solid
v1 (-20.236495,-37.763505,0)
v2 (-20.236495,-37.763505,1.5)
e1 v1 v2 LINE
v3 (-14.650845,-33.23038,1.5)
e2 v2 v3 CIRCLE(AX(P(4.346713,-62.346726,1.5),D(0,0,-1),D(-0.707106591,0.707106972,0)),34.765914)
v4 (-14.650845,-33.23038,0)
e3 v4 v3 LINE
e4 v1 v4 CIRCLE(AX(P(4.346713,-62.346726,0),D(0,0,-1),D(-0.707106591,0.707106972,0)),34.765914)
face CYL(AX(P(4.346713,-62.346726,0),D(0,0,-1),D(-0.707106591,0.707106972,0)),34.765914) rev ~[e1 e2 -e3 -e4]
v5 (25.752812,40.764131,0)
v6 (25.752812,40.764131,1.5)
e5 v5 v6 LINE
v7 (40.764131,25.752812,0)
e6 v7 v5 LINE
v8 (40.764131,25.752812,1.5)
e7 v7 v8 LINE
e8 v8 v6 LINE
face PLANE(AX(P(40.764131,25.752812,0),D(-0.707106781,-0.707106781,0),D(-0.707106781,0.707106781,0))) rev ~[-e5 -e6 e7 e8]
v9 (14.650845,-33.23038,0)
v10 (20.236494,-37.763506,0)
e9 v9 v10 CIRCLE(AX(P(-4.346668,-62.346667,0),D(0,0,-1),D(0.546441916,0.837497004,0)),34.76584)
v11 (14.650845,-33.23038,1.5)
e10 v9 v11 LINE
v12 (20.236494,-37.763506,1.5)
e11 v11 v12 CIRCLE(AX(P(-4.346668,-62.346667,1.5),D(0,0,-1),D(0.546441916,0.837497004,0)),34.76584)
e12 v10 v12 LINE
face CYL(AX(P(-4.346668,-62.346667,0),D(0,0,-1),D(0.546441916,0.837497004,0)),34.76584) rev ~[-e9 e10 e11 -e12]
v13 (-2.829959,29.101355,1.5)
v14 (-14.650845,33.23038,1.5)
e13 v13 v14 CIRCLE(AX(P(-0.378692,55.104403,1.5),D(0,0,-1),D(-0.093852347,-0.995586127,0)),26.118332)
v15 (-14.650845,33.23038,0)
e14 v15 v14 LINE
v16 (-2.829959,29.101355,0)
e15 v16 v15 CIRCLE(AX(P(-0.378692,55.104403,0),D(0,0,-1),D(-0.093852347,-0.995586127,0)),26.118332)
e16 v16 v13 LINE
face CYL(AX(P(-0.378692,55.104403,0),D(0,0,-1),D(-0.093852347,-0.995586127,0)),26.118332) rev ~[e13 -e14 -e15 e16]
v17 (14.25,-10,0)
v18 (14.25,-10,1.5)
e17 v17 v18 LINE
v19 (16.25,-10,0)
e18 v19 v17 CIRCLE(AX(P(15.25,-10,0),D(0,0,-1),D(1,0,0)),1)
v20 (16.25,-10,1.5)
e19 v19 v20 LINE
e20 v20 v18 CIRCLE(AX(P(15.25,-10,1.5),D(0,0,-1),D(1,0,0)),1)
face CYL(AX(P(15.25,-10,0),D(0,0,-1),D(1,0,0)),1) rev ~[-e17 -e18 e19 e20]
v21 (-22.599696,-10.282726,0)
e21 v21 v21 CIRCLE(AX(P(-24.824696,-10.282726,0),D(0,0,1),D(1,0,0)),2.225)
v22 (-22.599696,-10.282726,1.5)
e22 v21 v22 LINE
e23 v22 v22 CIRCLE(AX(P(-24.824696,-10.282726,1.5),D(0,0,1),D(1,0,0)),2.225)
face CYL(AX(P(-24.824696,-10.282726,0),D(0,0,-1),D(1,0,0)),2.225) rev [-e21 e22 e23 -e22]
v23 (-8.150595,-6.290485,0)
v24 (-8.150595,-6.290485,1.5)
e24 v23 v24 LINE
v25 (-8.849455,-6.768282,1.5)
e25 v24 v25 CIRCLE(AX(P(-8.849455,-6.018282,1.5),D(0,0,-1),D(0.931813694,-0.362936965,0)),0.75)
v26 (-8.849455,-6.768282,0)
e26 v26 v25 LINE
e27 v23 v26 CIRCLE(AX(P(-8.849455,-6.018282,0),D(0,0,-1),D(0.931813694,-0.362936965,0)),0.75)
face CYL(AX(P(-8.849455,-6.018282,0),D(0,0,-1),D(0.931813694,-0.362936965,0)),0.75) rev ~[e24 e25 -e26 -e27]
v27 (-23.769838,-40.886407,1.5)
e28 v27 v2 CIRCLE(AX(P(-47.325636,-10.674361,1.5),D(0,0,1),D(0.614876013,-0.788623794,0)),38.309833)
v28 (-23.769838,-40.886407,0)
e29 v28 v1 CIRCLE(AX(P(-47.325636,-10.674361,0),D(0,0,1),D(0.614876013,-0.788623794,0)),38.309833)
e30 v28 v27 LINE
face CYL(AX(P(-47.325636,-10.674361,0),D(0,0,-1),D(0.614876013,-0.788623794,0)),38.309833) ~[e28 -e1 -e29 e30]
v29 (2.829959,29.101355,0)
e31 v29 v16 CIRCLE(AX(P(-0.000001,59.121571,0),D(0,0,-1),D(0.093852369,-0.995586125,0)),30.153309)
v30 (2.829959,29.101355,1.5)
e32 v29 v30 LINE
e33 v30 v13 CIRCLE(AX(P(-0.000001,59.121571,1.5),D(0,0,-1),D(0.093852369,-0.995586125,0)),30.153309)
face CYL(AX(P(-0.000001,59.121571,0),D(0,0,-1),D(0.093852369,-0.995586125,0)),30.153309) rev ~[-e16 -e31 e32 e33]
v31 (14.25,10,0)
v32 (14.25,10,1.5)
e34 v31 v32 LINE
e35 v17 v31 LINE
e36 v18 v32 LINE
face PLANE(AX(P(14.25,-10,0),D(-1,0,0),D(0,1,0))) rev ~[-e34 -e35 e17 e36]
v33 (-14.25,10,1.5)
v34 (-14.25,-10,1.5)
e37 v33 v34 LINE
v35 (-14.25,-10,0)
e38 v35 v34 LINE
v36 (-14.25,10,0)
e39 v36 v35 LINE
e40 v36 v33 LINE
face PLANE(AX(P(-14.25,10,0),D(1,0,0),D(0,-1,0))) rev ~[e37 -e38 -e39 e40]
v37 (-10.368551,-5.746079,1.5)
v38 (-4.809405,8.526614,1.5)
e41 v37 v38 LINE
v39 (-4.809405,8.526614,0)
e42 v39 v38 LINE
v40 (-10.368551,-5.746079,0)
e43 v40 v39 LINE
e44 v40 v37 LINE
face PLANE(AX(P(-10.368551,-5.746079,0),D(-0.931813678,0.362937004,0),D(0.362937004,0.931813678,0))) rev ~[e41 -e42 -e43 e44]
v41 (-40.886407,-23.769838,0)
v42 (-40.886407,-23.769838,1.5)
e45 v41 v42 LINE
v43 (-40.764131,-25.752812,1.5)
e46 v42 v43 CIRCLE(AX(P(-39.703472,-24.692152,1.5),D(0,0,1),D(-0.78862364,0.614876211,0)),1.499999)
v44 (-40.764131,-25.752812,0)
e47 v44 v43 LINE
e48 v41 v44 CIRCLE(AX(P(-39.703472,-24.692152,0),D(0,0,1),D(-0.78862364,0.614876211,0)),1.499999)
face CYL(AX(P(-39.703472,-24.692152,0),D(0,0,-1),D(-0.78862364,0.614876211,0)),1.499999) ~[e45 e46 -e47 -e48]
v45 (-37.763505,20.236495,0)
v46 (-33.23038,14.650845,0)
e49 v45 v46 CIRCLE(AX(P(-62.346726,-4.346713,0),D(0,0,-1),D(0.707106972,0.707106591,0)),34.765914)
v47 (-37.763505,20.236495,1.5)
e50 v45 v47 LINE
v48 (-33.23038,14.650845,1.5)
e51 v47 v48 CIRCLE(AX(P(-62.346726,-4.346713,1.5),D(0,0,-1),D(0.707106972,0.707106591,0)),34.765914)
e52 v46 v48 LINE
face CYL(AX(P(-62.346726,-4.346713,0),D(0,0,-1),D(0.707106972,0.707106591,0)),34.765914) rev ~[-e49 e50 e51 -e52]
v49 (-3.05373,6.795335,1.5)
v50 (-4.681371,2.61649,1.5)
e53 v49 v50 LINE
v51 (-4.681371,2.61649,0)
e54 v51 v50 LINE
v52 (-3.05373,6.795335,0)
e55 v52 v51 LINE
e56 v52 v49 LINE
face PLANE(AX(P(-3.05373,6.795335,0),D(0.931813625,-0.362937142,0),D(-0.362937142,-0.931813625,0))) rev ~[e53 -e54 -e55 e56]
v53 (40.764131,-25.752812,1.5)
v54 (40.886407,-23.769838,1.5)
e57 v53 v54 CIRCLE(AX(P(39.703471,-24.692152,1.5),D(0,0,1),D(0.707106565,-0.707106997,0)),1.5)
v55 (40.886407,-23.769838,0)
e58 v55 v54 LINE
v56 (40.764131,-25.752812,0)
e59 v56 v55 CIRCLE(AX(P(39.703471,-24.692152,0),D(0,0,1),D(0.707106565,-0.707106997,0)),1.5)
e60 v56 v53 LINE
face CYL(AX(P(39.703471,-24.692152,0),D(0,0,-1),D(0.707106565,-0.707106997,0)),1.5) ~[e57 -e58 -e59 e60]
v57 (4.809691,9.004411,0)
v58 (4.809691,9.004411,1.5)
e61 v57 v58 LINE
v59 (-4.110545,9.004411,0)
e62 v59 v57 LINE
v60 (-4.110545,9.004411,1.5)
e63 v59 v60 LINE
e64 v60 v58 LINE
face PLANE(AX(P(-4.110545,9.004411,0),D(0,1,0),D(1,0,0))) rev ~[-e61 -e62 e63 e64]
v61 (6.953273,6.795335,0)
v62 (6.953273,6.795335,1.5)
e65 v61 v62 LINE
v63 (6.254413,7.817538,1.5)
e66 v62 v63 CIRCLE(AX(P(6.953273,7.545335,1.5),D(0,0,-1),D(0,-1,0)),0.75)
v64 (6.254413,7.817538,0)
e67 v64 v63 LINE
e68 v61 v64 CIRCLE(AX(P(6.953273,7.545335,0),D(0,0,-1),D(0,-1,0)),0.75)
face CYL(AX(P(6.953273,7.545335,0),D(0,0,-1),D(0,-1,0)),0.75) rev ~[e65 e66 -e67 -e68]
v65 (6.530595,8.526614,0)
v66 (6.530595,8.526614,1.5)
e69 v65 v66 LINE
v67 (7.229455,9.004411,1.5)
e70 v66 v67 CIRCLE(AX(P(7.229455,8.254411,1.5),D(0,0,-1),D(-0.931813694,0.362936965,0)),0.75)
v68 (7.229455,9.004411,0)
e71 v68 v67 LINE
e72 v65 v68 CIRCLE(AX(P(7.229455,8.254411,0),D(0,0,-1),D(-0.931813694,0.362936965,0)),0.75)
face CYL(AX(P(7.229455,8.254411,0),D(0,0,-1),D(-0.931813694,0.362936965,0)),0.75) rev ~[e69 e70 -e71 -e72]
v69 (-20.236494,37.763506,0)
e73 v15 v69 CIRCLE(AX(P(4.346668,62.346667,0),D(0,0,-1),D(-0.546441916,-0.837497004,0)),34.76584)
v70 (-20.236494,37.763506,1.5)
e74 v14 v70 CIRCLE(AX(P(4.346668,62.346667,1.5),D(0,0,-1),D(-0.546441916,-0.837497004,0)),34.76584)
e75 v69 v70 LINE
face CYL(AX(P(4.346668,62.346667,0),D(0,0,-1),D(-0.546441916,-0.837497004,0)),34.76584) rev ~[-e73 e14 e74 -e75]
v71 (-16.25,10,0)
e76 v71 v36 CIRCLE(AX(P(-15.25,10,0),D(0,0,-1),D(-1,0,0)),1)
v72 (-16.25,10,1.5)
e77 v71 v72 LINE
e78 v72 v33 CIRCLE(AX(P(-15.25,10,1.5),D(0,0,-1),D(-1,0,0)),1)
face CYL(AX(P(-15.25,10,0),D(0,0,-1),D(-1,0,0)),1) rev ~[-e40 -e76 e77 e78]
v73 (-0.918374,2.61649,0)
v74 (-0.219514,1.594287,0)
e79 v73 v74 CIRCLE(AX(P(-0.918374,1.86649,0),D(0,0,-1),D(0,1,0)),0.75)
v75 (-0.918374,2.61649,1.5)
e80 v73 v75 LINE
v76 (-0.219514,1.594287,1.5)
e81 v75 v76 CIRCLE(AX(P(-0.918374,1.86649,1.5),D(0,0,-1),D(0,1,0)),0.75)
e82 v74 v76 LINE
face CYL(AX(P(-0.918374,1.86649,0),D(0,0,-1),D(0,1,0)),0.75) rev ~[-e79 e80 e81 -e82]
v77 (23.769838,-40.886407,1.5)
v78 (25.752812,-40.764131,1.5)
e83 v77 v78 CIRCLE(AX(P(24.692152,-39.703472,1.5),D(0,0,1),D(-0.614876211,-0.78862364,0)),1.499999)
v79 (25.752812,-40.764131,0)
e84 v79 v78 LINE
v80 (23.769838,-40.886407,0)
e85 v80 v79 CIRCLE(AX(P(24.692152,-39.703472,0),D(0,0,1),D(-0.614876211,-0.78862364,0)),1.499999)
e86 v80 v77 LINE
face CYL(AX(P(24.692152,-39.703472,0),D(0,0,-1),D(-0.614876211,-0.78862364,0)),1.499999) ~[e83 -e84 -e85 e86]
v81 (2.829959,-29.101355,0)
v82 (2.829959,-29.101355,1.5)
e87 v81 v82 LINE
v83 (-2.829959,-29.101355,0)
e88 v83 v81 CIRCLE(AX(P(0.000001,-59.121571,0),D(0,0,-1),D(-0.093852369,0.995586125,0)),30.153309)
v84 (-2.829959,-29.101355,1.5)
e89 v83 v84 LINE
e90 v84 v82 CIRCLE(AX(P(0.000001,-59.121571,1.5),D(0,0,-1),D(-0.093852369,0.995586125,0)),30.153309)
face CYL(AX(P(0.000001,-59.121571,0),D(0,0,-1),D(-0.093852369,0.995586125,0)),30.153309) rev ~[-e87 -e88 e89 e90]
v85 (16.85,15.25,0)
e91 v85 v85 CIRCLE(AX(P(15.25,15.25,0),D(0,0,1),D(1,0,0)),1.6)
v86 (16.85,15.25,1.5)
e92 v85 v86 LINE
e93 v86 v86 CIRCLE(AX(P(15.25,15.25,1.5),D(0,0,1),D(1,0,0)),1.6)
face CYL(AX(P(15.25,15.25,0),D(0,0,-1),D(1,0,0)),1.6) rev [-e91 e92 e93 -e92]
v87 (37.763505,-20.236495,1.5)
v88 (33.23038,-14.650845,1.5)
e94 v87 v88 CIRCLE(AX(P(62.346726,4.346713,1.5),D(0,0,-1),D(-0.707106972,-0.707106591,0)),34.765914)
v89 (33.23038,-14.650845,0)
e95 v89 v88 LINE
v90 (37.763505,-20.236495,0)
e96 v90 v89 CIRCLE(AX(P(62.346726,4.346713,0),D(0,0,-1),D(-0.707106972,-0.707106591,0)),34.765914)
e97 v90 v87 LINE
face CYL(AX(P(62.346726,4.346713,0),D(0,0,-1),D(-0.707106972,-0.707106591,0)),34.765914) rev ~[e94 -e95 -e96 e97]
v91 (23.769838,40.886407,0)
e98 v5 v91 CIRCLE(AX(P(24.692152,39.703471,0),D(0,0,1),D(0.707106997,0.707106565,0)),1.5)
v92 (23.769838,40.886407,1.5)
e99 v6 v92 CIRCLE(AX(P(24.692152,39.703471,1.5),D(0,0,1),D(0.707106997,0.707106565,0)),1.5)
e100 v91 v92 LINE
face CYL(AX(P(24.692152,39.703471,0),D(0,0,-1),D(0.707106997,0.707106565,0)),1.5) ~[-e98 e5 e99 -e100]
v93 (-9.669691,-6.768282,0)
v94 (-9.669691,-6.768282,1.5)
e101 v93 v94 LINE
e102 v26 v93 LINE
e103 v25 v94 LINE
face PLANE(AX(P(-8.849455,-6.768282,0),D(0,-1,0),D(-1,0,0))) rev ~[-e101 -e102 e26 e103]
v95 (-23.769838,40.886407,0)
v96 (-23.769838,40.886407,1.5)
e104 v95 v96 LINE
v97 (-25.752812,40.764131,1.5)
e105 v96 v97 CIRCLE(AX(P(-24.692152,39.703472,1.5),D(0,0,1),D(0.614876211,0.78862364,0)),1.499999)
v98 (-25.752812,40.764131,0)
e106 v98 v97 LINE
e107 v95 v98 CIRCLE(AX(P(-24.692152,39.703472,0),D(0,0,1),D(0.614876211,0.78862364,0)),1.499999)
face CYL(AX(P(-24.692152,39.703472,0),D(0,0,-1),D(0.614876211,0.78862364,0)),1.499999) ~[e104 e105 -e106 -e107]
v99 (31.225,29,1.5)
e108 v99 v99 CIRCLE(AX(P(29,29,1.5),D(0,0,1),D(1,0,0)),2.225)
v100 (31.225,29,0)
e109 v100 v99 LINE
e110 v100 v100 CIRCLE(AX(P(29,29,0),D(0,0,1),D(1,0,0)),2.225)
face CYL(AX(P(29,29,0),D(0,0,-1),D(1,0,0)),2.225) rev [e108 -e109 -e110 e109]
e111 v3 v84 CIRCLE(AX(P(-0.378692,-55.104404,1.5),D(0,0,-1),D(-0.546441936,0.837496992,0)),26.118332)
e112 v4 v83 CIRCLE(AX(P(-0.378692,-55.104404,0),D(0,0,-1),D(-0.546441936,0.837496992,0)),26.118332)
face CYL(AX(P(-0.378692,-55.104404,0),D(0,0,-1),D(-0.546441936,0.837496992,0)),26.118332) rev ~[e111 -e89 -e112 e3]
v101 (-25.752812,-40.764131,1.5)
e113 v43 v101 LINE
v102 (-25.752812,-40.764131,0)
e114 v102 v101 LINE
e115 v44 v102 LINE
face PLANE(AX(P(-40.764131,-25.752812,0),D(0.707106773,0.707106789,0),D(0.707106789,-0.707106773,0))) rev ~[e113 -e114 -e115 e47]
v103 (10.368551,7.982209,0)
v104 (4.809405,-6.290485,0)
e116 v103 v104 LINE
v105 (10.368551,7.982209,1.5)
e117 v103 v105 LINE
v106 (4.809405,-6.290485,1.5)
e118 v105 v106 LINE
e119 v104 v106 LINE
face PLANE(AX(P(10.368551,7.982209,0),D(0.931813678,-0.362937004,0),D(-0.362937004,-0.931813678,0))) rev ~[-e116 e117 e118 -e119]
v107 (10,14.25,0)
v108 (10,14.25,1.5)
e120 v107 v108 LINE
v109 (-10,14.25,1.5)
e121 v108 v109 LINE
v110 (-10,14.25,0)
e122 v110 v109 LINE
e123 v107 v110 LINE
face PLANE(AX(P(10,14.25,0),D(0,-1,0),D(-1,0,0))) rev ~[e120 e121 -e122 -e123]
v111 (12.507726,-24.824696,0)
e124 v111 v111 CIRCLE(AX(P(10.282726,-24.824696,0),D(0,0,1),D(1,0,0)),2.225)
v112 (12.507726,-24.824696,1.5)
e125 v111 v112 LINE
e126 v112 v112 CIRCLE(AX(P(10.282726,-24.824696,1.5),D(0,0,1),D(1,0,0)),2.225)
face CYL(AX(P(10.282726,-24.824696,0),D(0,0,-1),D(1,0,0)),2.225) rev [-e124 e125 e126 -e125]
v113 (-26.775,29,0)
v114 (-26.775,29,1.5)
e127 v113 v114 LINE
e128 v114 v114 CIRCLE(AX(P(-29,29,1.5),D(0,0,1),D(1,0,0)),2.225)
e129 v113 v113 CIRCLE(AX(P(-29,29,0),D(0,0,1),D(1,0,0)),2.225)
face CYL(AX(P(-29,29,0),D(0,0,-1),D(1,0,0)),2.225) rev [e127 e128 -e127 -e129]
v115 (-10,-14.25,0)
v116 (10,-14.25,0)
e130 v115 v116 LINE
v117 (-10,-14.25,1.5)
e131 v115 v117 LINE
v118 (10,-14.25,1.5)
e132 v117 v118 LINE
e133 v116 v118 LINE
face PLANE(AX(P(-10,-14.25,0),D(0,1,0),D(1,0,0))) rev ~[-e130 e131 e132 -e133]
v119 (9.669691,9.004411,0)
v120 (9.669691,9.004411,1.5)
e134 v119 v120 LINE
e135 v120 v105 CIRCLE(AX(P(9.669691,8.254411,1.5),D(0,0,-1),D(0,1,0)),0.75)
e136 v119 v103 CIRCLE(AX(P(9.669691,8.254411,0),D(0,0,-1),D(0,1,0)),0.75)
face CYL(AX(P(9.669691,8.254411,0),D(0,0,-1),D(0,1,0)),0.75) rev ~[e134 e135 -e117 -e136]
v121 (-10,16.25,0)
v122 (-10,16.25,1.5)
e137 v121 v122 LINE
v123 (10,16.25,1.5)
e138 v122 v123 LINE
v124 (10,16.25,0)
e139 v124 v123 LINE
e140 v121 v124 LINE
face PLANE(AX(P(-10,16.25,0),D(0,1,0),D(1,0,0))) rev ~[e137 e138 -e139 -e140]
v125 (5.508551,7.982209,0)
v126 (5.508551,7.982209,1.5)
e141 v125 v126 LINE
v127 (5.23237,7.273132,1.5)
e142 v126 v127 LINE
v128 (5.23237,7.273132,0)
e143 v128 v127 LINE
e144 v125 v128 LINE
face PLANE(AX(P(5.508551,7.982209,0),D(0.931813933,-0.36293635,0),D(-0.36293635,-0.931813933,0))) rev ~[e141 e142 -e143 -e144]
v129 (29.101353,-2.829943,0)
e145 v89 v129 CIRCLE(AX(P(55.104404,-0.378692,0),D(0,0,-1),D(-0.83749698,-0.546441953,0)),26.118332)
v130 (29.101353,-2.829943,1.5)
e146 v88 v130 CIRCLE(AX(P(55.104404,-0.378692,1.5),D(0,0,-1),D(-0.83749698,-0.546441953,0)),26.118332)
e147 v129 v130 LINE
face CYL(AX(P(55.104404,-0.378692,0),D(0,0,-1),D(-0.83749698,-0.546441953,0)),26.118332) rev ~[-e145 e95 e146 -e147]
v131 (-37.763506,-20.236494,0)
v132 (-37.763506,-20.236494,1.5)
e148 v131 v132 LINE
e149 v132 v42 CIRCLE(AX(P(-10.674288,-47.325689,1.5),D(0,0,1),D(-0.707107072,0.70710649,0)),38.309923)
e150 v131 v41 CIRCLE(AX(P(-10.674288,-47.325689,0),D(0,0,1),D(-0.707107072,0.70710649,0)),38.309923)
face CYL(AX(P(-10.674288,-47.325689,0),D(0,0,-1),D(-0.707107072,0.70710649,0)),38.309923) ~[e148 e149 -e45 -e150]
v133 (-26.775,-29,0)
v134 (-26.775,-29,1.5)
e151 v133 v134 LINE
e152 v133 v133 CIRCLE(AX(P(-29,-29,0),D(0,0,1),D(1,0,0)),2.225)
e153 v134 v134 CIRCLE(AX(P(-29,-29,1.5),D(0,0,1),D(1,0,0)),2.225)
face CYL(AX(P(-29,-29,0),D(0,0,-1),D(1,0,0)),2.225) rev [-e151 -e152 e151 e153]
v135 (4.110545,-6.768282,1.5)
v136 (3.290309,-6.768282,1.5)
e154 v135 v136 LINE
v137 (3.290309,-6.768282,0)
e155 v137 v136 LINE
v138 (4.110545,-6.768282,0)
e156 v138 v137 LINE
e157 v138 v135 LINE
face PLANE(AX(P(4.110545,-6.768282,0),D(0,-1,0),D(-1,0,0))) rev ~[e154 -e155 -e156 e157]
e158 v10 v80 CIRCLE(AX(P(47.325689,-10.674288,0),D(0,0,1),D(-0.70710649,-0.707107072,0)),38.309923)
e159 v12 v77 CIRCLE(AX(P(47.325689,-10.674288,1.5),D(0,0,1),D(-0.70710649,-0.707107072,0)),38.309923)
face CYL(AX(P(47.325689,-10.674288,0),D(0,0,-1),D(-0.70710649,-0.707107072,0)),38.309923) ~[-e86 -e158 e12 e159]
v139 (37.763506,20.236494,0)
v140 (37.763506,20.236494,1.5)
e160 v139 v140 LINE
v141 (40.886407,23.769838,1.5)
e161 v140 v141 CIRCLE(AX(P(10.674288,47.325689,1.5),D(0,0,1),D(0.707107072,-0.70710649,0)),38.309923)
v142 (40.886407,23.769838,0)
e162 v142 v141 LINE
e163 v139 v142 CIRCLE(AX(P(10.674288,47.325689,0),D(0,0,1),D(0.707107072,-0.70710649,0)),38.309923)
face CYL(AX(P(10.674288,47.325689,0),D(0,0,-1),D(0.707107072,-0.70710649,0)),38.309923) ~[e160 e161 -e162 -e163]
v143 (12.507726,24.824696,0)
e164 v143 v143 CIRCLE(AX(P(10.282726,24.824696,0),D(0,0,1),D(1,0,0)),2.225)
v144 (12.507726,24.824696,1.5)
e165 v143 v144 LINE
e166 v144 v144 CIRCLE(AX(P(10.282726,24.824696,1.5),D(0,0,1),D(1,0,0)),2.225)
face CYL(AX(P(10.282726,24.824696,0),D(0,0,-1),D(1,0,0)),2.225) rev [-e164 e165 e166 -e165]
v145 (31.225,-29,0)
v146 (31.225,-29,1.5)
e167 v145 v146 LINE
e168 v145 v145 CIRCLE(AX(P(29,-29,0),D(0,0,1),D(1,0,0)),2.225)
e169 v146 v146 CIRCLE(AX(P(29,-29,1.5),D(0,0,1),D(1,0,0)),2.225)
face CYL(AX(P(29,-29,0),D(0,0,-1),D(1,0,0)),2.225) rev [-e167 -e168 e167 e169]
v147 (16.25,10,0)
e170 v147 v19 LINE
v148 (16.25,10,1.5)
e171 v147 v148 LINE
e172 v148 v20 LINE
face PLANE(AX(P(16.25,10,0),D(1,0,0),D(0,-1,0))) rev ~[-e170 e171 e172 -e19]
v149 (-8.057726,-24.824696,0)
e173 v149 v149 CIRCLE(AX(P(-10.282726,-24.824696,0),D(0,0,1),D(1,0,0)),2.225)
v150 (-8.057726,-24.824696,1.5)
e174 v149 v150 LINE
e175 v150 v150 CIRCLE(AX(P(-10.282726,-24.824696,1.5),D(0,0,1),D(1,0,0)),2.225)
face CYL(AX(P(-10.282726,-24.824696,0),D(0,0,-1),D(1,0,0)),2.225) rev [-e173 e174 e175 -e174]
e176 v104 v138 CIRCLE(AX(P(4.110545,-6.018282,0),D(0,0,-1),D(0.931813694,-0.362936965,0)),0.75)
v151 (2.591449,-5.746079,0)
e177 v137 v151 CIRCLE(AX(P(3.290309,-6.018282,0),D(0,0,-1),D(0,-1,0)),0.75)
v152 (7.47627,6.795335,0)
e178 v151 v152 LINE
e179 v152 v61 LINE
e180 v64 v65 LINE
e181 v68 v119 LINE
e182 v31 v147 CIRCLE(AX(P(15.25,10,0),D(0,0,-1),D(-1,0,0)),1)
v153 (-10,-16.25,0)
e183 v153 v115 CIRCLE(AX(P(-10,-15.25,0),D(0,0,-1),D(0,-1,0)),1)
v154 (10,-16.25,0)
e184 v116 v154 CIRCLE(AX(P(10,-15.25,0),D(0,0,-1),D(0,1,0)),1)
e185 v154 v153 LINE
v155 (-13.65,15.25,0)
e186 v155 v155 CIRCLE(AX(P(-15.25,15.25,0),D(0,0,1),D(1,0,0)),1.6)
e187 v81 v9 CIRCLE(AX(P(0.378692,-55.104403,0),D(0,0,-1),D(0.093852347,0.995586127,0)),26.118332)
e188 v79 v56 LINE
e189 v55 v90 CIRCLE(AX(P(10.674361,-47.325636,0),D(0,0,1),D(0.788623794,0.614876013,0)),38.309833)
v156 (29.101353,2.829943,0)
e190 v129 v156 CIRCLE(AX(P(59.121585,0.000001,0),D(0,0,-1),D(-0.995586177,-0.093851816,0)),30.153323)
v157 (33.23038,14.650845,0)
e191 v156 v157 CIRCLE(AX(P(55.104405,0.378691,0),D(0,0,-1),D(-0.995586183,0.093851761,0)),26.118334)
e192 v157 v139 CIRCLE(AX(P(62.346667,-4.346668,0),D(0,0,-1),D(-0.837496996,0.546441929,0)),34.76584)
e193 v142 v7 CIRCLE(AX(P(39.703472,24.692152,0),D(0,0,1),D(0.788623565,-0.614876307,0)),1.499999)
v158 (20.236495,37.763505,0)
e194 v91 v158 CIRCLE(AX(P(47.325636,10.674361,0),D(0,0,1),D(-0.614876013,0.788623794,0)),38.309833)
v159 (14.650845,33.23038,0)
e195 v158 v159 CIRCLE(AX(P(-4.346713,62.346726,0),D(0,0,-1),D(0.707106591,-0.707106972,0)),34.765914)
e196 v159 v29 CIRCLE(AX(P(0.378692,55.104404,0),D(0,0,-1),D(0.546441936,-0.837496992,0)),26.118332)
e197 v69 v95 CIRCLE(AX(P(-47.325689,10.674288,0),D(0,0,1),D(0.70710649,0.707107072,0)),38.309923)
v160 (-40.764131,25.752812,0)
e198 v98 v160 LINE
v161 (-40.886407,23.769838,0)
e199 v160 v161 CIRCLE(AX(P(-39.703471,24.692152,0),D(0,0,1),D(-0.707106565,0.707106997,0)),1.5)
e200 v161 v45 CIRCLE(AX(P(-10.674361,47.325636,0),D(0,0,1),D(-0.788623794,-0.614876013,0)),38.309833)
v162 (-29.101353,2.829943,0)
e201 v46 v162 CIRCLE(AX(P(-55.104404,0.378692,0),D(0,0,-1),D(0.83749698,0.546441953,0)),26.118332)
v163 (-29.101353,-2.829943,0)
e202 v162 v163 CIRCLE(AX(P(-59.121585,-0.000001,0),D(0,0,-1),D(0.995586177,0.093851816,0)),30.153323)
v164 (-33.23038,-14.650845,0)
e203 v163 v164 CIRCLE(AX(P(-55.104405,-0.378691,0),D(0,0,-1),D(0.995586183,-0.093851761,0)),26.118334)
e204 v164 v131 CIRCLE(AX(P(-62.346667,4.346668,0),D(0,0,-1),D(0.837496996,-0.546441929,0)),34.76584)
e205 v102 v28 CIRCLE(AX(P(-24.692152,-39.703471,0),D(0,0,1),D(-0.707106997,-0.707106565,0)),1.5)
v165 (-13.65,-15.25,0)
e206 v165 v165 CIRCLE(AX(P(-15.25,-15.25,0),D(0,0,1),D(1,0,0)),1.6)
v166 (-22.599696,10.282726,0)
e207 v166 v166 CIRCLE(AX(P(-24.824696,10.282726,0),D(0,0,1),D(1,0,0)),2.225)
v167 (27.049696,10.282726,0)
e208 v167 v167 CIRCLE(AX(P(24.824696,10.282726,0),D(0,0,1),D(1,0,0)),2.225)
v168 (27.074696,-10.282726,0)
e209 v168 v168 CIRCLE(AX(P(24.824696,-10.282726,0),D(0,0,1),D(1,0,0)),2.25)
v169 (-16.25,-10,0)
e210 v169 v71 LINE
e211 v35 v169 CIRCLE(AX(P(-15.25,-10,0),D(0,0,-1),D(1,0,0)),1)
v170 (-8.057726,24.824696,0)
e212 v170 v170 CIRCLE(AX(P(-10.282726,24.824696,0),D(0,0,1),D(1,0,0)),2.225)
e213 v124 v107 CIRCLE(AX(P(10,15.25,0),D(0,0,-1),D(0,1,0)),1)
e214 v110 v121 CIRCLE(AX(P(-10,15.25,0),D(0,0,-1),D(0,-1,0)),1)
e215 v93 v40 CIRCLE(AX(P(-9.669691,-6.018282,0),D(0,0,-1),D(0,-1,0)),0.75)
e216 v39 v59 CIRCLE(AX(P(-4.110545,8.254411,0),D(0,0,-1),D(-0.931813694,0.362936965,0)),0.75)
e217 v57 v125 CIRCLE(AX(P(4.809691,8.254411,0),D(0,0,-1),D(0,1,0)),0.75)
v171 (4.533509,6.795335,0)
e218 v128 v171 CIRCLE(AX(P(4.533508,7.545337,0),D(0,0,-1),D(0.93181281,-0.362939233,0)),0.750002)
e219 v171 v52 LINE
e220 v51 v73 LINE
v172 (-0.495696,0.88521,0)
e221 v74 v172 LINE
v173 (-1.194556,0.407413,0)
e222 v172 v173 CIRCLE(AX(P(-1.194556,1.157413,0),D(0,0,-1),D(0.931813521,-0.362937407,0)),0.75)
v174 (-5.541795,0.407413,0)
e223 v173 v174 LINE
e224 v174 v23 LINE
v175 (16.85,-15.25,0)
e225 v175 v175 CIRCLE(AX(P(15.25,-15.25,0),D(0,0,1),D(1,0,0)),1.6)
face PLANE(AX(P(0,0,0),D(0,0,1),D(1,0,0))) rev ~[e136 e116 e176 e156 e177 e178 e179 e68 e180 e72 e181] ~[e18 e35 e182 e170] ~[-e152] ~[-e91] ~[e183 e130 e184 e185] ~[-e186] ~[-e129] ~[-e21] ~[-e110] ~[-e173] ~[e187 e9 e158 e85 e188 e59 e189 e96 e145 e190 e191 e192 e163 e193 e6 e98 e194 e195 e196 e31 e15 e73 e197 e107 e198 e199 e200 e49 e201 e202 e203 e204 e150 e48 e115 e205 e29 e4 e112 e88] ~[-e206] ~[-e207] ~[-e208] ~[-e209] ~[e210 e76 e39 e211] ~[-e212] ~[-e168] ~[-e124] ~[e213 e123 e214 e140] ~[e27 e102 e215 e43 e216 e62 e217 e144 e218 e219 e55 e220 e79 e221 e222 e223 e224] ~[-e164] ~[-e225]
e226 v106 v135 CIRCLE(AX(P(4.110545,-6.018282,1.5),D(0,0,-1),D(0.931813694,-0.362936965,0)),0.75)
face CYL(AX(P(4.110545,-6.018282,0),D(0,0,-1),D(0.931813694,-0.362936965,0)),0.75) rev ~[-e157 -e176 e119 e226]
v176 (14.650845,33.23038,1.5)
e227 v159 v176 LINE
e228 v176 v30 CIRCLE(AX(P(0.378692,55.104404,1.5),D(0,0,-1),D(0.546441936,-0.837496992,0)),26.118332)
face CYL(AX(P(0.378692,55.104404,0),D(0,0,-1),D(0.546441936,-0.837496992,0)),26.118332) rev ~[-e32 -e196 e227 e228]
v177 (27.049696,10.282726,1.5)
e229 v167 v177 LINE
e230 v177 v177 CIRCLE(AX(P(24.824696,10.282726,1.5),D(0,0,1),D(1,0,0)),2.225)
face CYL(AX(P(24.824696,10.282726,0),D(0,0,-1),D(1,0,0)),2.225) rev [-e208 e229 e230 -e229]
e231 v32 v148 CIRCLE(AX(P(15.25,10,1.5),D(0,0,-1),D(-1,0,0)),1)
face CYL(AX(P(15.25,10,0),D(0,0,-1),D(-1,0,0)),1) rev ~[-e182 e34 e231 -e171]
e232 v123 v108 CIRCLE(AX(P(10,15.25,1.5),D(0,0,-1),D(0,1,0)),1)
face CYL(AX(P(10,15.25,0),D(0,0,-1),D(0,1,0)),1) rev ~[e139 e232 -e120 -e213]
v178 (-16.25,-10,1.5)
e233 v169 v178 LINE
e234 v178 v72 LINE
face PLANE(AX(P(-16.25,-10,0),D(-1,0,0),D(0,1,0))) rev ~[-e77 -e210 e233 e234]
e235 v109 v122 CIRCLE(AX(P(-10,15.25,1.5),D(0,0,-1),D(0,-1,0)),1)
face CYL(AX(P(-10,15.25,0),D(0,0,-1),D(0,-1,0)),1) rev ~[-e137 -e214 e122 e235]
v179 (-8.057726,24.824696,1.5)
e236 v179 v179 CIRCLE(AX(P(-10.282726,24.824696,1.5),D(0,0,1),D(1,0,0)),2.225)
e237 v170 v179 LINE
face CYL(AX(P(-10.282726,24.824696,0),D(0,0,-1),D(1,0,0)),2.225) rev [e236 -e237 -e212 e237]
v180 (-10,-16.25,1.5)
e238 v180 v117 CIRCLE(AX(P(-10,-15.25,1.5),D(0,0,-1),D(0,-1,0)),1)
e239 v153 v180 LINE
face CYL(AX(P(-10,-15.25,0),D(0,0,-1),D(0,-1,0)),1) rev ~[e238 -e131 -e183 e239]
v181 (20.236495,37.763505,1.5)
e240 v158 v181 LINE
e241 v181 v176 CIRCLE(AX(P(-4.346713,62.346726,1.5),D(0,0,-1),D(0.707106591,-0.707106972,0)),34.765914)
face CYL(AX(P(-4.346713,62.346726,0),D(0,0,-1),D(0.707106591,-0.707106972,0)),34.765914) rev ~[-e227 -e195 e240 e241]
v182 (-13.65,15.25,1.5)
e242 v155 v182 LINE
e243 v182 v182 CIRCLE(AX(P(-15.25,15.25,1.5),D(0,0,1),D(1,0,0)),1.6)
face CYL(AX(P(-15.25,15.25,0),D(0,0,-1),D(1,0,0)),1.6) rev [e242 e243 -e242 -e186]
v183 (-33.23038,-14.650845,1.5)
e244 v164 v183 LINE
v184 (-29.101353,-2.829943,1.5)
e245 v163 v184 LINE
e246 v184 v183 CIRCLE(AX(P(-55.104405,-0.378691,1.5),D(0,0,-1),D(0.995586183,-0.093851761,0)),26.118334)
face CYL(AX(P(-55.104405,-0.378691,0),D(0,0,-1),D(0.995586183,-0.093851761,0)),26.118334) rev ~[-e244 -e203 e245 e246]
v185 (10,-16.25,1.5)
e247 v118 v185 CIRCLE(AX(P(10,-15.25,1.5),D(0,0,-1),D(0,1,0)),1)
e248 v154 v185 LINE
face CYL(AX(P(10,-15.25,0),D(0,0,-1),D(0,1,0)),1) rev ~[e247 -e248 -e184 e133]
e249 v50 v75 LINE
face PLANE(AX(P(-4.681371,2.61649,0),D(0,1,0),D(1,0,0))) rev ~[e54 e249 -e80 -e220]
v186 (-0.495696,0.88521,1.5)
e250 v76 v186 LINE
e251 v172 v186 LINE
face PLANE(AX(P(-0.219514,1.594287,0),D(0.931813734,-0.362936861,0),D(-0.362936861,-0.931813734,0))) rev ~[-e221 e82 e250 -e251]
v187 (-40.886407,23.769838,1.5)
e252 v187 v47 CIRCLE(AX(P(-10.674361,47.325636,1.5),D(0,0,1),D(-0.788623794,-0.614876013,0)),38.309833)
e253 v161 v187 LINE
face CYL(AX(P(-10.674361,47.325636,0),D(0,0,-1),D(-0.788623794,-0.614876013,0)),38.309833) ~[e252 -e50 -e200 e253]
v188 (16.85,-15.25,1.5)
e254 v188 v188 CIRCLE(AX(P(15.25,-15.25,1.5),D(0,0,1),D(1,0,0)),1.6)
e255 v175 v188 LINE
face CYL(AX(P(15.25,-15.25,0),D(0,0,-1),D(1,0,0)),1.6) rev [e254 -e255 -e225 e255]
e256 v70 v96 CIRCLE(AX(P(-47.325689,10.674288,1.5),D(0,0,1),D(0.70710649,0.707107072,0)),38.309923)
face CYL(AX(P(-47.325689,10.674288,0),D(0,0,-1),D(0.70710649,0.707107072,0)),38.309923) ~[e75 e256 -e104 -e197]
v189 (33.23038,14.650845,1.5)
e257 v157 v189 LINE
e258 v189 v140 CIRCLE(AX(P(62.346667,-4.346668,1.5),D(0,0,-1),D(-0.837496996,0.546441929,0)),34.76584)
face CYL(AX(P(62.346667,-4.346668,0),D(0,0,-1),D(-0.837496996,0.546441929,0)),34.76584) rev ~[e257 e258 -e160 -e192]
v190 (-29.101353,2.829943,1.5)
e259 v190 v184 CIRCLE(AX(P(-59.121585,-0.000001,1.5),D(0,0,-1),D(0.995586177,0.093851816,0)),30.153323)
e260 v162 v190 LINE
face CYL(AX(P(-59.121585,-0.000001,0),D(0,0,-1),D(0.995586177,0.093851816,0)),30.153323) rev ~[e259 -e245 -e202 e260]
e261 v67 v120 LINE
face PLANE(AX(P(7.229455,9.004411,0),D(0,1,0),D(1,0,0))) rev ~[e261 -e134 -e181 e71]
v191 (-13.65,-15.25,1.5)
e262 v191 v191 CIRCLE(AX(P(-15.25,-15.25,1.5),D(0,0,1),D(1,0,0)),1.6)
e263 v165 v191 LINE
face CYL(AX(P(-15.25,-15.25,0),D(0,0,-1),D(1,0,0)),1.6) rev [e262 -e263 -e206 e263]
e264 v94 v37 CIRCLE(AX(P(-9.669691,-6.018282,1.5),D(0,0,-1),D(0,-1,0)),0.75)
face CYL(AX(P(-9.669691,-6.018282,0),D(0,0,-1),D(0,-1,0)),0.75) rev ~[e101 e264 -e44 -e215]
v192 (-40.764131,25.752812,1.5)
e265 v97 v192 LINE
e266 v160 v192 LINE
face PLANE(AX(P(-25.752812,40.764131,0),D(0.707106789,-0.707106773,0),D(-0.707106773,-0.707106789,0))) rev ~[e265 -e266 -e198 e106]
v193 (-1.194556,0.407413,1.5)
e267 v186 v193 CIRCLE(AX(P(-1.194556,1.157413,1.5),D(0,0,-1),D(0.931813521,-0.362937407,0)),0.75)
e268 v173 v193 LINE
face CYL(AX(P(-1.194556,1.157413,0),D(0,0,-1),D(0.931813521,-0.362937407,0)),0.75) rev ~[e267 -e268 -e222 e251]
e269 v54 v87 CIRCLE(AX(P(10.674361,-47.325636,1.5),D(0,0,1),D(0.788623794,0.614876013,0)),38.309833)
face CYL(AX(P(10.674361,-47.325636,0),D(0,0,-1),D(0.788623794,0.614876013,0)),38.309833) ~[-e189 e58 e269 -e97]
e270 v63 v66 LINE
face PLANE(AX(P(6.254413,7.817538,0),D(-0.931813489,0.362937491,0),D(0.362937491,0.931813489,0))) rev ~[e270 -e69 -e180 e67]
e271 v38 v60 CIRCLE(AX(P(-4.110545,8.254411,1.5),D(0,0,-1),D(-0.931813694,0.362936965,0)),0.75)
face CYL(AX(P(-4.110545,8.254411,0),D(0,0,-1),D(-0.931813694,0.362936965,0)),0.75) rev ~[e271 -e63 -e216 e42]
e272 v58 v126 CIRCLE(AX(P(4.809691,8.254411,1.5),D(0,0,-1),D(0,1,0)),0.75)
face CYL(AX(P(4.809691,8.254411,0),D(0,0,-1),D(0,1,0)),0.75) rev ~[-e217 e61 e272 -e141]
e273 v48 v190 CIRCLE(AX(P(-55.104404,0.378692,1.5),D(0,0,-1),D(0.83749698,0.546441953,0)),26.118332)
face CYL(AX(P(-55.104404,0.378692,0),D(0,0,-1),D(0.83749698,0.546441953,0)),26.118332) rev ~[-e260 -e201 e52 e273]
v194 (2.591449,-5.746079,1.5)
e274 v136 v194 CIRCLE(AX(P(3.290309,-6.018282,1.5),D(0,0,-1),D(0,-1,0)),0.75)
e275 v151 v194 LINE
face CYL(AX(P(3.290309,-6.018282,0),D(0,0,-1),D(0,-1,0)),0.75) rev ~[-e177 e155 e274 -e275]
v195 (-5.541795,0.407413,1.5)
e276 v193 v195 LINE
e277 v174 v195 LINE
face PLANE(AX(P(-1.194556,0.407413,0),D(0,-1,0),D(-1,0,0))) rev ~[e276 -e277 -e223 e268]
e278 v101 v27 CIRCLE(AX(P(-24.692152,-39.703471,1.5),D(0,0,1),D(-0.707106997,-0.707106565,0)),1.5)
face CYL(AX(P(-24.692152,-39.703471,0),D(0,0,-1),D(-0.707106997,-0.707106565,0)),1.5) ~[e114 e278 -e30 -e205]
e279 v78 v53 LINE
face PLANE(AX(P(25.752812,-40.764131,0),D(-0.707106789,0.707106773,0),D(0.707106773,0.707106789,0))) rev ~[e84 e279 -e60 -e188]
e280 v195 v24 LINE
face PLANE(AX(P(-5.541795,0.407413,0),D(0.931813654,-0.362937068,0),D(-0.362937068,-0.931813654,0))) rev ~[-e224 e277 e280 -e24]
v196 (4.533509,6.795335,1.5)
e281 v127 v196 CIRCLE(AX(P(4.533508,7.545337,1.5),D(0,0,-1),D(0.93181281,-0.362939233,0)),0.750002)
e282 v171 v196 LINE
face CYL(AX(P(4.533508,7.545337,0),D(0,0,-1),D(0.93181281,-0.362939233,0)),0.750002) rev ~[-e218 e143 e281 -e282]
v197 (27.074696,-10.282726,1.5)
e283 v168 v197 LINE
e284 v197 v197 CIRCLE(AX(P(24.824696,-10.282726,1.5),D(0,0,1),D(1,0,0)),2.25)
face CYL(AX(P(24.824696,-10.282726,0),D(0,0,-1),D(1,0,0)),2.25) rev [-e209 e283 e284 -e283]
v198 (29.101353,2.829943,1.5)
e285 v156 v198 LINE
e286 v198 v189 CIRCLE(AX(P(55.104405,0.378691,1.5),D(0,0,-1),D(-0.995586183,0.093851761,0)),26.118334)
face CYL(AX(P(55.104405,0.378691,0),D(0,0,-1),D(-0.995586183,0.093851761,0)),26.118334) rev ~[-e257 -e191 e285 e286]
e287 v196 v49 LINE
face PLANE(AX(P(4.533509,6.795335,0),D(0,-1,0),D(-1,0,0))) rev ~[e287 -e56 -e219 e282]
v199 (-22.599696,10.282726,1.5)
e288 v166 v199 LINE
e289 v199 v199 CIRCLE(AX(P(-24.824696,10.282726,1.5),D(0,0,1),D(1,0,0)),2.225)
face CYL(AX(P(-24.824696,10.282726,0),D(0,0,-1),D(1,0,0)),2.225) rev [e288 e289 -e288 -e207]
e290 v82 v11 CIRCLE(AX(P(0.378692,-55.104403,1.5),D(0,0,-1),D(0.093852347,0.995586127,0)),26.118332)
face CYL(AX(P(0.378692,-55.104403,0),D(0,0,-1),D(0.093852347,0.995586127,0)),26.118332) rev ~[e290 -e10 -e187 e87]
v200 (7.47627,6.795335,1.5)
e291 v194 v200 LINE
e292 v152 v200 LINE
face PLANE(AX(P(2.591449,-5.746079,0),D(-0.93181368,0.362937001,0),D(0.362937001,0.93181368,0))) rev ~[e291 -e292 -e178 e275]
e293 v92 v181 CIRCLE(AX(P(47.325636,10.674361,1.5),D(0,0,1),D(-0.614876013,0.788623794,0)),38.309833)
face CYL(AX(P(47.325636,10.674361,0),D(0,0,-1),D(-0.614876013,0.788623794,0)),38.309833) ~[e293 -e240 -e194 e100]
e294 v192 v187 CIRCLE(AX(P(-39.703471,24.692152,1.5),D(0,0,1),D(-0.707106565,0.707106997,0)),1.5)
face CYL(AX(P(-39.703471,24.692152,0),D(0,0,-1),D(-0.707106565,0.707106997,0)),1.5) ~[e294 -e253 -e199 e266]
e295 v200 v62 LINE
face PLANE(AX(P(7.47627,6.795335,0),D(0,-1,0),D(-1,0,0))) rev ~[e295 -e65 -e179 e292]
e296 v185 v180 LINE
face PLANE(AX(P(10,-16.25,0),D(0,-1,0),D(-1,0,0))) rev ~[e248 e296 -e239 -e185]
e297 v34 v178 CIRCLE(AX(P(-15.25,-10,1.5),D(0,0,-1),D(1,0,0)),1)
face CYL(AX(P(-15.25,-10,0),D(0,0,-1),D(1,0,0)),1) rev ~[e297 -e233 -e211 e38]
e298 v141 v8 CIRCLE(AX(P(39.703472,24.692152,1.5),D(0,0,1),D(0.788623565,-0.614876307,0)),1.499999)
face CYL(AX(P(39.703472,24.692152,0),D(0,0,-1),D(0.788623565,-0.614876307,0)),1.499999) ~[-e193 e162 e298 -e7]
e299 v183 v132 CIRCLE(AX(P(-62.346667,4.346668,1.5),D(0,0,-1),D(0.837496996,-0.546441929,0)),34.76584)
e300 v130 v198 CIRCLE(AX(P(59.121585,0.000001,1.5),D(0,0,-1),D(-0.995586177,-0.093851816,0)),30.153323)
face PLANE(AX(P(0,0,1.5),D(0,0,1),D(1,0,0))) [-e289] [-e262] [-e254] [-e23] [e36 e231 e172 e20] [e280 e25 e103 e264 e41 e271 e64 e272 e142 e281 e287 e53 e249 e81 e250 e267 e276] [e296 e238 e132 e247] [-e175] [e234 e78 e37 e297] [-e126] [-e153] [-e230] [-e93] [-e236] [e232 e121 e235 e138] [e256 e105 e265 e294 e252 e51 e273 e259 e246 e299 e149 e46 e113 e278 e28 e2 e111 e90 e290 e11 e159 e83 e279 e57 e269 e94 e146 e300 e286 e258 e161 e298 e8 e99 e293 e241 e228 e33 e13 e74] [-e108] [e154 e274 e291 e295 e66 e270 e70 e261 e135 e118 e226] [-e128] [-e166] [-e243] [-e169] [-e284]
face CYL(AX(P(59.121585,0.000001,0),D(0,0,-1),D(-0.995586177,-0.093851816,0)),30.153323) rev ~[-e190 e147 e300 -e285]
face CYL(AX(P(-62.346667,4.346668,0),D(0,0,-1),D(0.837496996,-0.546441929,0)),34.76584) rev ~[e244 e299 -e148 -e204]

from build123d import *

# Parameters (mm, degrees)
F0_R     = 2.225
F0_R_2   = 1.6
F0_R_3   = 2.25
F1_DEPTH = 1.5


# Not quite as in the source:
# - ends of sketch curves that miss each other by under 0.0002 mm in the source are joined


with BuildPart() as f1:
    # F0 (on Top) → F1 (new body)
    with BuildSketch(Plane.XY):
        with BuildLine():
            Line((40.764131, 25.752812), (25.752812, 40.764131))
            ThreePointArc((25.752812, 40.764131), (24.7844707903, 41.2006273849), (23.7698381424, 40.8864068174))
            ThreePointArc((23.7698381424, 40.8864068174), (21.9550704325, 39.3793732762), (20.2364945752, 37.7635054248))
            ThreePointArc((20.2364945752, 37.7635054248), (17.5612326137, 35.3520830837), (14.6508446305, 33.2303795663))
            ThreePointArc((14.6508446305, 33.2303795663), (8.9914965544, 30.4470141229), (2.8299590067, 29.1013549294))
            ThreePointArc((2.8299590067, 29.1013549294), (0, 28.968262), (-2.8299590155, 29.1013548358))
            ThreePointArc((-2.8299590155, 29.1013548358), (-8.9914965544, 30.4470141229), (-14.6508445509, 33.2303796882))
            ThreePointArc((-14.6508445509, 33.2303796882), (-17.5612326137, 35.3520830837), (-20.2364941171, 37.7635058829))
            ThreePointArc((-20.2364941171, 37.7635058829), (-21.9550704325, 39.3793732762), (-23.7698383319, 40.8864065743))
            ThreePointArc((-23.7698383319, 40.8864065743), (-24.7844707903, 41.2006273849), (-25.7528121718, 40.7641311718))
            Line((-25.7528121718, 40.7641311718), (-40.764131, 25.752812))
            ThreePointArc((-40.764131, 25.752812), (-41.2006273849, 24.7844707903), (-40.8864068174, 23.7698381424))
            ThreePointArc((-40.8864068174, 23.7698381424), (-39.3793732762, 21.9550704325), (-37.7635054248, 20.2364945752))
            ThreePointArc((-37.7635054248, 20.2364945752), (-35.3520832558, 17.5612328258), (-33.2303798649, 14.6508450882))
            ThreePointArc((-33.2303798649, 14.6508450882), (-30.4470115556, 8.9914892045), (-29.1013534168, 2.8299429607))
            ThreePointArc((-29.1013534168, 2.8299429607), (-28.968262, 0), (-29.1013532045, -2.8299429807))
            ThreePointArc((-29.1013532045, -2.8299429807), (-30.4470115556, -8.9914892045), (-33.2303799868, -14.6508450086))
            ThreePointArc((-33.2303799868, -14.6508450086), (-35.3520832558, -17.5612328258), (-37.7635058829, -20.2364941171))
            ThreePointArc((-37.7635058829, -20.2364941171), (-39.3793732762, -21.9550704325), (-40.8864065743, -23.7698383319))
            ThreePointArc((-40.8864065743, -23.7698383319), (-41.2006273849, -24.7844707903), (-40.7641311718, -25.7528121718))
            Line((-40.7641311718, -25.7528121718), (-25.752812, -40.764131))
            ThreePointArc((-25.752812, -40.764131), (-24.7844707903, -41.2006273849), (-23.7698381424, -40.8864068174))
            ThreePointArc((-23.7698381424, -40.8864068174), (-21.9550704325, -39.3793732762), (-20.2364945752, -37.7635054248))
            ThreePointArc((-20.2364945752, -37.7635054248), (-17.5612326137, -35.3520830837), (-14.6508446305, -33.2303795663))
            ThreePointArc((-14.6508446305, -33.2303795663), (-8.9914965544, -30.4470141229), (-2.8299590067, -29.1013549294))
            ThreePointArc((-2.8299590067, -29.1013549294), (0, -28.968262), (2.8299590155, -29.1013548358))
            ThreePointArc((2.8299590155, -29.1013548358), (8.9914965544, -30.4470141229), (14.6508445509, -33.2303796882))
            ThreePointArc((14.6508445509, -33.2303796882), (17.5612326137, -35.3520830837), (20.2364941171, -37.7635058829))
            ThreePointArc((20.2364941171, -37.7635058829), (21.9550704325, -39.3793732762), (23.7698383319, -40.8864065743))
            ThreePointArc((23.7698383319, -40.8864065743), (24.7844707903, -41.2006273849), (25.7528121718, -40.7641311718))
            Line((25.7528121718, -40.7641311718), (40.764131, -25.752812))
            ThreePointArc((40.764131, -25.752812), (41.2006273849, -24.7844707903), (40.8864068174, -23.7698381424))
            ThreePointArc((40.8864068174, -23.7698381424), (39.3793732762, -21.9550704325), (37.7635054248, -20.2364945752))
            ThreePointArc((37.7635054248, -20.2364945752), (35.3520832558, -17.5612328258), (33.2303798649, -14.6508450882))
            ThreePointArc((33.2303798649, -14.6508450882), (30.4470115556, -8.9914892045), (29.1013534168, -2.8299429607))
            ThreePointArc((29.1013534168, -2.8299429607), (28.968262, 0), (29.1013532045, 2.8299429807))
            ThreePointArc((29.1013532045, 2.8299429807), (30.4470115556, 8.9914892045), (33.2303799868, 14.6508450086))
            ThreePointArc((33.2303799868, 14.6508450086), (35.3520832558, 17.5612328258), (37.7635058829, 20.2364941171))
            ThreePointArc((37.7635058829, 20.2364941171), (39.3793732762, 21.9550704325), (40.8864065743, 23.7698383319))
            ThreePointArc((40.8864065743, 23.7698383319), (41.2006273849, 24.7844707903), (40.764131, 25.752812))
        make_face()
        with Locations((-29, -29)):
            Circle(F0_R, mode=Mode.SUBTRACT)
        with Locations((-10.282726, -24.824696)):
            Circle(F0_R, mode=Mode.SUBTRACT)
        with Locations((-24.824696, -10.282726)):
            Circle(F0_R, mode=Mode.SUBTRACT)
        with Locations((-15.25, -15.25)):
            Circle(F0_R_2, mode=Mode.SUBTRACT)
        with Locations((10.282726, -24.824696)):
            Circle(F0_R, mode=Mode.SUBTRACT)
        with Locations((29, -29)):
            Circle(F0_R, mode=Mode.SUBTRACT)
        with BuildLine():
            Line((-10, -14.25), (10, -14.25))
            ThreePointArc((10, -14.25), (11, -15.25), (10, -16.25))
            Line((10, -16.25), (-10, -16.25))
            ThreePointArc((-10, -16.25), (-11, -15.25), (-10, -14.25))
        make_face(mode=Mode.SUBTRACT)
        with Locations((15.25, -15.25)):
            Circle(F0_R_2, mode=Mode.SUBTRACT)
        with Locations((24.824696, -10.282726)):
            Circle(F0_R_3, mode=Mode.SUBTRACT)
        with Locations((-24.824696, 10.282726)):
            Circle(F0_R, mode=Mode.SUBTRACT)
        with BuildLine():
            ThreePointArc((-16.25, 10), (-15.25, 11), (-14.25, 10))
            Line((-14.25, 10), (-14.25, -10))
            ThreePointArc((-14.25, -10), (-15.25, -11), (-16.25, -10))
            Line((-16.25, -10), (-16.25, 10))
        make_face(mode=Mode.SUBTRACT)
        with BuildLine():
            ThreePointArc((-0.4956958589, 0.885209945), (-0.771266673, 0.5382796173), (-1.194556, 0.407413))
            Line((-1.194556, 0.407413), (-5.541795, 0.407413))
            Line((-5.541795, 0.407413), (-8.150595, -6.290485))
            ThreePointArc((-8.150595, -6.290485), (-8.426165673, -6.6374153827), (-8.849455, -6.768282))
            Line((-8.849455, -6.768282), (-9.669691, -6.768282))
            ThreePointArc((-9.669691, -6.768282), (-10.2888243827, -6.441571327), (-10.3685511411, -5.746078945))
            Line((-10.3685511411, -5.746078945), (-4.809405, 8.526614))
            ThreePointArc((-4.809405, 8.526614), (-4.533834327, 8.8735443827), (-4.110545, 9.004411))
            Line((-4.110545, 9.004411), (4.809691, 9.004411))
            ThreePointArc((4.809691, 9.004411), (5.4288241198, 8.6777007117), (5.5085514793, 7.9822088133))
            Line((5.5085514793, 7.9822088133), (5.23237, 7.273132))
            ThreePointArc((5.23237, 7.273132), (4.9567984768, 6.9262017197), (4.533509, 6.795335))
            Line((4.533509, 6.795335), (-3.05373, 6.795335))
            Line((-3.05373, 6.795335), (-4.681371, 2.61649))
            Line((-4.681371, 2.61649), (-0.918374, 2.61649))
            ThreePointArc((-0.918374, 2.61649), (-0.2992406173, 2.289779327), (-0.2195138589, 1.594286945))
            Line((-0.2195138589, 1.594286945), (-0.4956958589, 0.885209945))
        make_face(mode=Mode.SUBTRACT)
        with Locations((-15.25, 15.25)):
            Circle(F0_R_2, mode=Mode.SUBTRACT)
        with Locations((-29, 29)):
            Circle(F0_R, mode=Mode.SUBTRACT)
        with Locations((-10.282726, 24.824696)):
            Circle(F0_R, mode=Mode.SUBTRACT)
        with BuildLine():
            ThreePointArc((3.290309, -6.768282), (2.6711756173, -6.441571327), (2.5914488589, -5.746078945))
            Line((2.5914488589, -5.746078945), (7.47627, 6.795335))
            Line((7.47627, 6.795335), (6.953273, 6.795335))
            ThreePointArc((6.953273, 6.795335), (6.3341396173, 7.122045673), (6.2544128589, 7.817538055))
            Line((6.2544128589, 7.817538055), (6.530595, 8.526614))
            ThreePointArc((6.530595, 8.526614), (6.806165673, 8.8735443827), (7.229455, 9.004411))
            Line((7.229455, 9.004411), (9.669691, 9.004411))
            ThreePointArc((9.669691, 9.004411), (10.2888241198, 8.6777007117), (10.3685514793, 7.9822088133))
            Line((10.3685514793, 7.9822088133), (4.809405, -6.290485))
            ThreePointArc((4.809405, -6.290485), (4.533834327, -6.6374153827), (4.110545, -6.768282))
            Line((4.110545, -6.768282), (3.290309, -6.768282))
        make_face(mode=Mode.SUBTRACT)
        with BuildLine():
            Line((14.25, -10), (14.25, 10))
            ThreePointArc((14.25, 10), (15.25, 11), (16.25, 10))
            Line((16.25, 10), (16.25, -10))
            ThreePointArc((16.25, -10), (15.25, -11), (14.25, -10))
        make_face(mode=Mode.SUBTRACT)
        with BuildLine():
            ThreePointArc((10, 16.25), (11, 15.25), (10, 14.25))
            Line((10, 14.25), (-10, 14.25))
            ThreePointArc((-10, 14.25), (-11, 15.25), (-10, 16.25))
            Line((-10, 16.25), (10, 16.25))
        make_face(mode=Mode.SUBTRACT)
        with Locations((15.25, 15.25)):
            Circle(F0_R_2, mode=Mode.SUBTRACT)
        with Locations((24.824696, 10.282726)):
            Circle(F0_R, mode=Mode.SUBTRACT)
        with Locations((10.282726, 24.824696)):
            Circle(F0_R, mode=Mode.SUBTRACT)
        with Locations((29, 29)):
            Circle(F0_R, mode=Mode.SUBTRACT)
    extrude(amount=F1_DEPTH)


solid = f1.part
